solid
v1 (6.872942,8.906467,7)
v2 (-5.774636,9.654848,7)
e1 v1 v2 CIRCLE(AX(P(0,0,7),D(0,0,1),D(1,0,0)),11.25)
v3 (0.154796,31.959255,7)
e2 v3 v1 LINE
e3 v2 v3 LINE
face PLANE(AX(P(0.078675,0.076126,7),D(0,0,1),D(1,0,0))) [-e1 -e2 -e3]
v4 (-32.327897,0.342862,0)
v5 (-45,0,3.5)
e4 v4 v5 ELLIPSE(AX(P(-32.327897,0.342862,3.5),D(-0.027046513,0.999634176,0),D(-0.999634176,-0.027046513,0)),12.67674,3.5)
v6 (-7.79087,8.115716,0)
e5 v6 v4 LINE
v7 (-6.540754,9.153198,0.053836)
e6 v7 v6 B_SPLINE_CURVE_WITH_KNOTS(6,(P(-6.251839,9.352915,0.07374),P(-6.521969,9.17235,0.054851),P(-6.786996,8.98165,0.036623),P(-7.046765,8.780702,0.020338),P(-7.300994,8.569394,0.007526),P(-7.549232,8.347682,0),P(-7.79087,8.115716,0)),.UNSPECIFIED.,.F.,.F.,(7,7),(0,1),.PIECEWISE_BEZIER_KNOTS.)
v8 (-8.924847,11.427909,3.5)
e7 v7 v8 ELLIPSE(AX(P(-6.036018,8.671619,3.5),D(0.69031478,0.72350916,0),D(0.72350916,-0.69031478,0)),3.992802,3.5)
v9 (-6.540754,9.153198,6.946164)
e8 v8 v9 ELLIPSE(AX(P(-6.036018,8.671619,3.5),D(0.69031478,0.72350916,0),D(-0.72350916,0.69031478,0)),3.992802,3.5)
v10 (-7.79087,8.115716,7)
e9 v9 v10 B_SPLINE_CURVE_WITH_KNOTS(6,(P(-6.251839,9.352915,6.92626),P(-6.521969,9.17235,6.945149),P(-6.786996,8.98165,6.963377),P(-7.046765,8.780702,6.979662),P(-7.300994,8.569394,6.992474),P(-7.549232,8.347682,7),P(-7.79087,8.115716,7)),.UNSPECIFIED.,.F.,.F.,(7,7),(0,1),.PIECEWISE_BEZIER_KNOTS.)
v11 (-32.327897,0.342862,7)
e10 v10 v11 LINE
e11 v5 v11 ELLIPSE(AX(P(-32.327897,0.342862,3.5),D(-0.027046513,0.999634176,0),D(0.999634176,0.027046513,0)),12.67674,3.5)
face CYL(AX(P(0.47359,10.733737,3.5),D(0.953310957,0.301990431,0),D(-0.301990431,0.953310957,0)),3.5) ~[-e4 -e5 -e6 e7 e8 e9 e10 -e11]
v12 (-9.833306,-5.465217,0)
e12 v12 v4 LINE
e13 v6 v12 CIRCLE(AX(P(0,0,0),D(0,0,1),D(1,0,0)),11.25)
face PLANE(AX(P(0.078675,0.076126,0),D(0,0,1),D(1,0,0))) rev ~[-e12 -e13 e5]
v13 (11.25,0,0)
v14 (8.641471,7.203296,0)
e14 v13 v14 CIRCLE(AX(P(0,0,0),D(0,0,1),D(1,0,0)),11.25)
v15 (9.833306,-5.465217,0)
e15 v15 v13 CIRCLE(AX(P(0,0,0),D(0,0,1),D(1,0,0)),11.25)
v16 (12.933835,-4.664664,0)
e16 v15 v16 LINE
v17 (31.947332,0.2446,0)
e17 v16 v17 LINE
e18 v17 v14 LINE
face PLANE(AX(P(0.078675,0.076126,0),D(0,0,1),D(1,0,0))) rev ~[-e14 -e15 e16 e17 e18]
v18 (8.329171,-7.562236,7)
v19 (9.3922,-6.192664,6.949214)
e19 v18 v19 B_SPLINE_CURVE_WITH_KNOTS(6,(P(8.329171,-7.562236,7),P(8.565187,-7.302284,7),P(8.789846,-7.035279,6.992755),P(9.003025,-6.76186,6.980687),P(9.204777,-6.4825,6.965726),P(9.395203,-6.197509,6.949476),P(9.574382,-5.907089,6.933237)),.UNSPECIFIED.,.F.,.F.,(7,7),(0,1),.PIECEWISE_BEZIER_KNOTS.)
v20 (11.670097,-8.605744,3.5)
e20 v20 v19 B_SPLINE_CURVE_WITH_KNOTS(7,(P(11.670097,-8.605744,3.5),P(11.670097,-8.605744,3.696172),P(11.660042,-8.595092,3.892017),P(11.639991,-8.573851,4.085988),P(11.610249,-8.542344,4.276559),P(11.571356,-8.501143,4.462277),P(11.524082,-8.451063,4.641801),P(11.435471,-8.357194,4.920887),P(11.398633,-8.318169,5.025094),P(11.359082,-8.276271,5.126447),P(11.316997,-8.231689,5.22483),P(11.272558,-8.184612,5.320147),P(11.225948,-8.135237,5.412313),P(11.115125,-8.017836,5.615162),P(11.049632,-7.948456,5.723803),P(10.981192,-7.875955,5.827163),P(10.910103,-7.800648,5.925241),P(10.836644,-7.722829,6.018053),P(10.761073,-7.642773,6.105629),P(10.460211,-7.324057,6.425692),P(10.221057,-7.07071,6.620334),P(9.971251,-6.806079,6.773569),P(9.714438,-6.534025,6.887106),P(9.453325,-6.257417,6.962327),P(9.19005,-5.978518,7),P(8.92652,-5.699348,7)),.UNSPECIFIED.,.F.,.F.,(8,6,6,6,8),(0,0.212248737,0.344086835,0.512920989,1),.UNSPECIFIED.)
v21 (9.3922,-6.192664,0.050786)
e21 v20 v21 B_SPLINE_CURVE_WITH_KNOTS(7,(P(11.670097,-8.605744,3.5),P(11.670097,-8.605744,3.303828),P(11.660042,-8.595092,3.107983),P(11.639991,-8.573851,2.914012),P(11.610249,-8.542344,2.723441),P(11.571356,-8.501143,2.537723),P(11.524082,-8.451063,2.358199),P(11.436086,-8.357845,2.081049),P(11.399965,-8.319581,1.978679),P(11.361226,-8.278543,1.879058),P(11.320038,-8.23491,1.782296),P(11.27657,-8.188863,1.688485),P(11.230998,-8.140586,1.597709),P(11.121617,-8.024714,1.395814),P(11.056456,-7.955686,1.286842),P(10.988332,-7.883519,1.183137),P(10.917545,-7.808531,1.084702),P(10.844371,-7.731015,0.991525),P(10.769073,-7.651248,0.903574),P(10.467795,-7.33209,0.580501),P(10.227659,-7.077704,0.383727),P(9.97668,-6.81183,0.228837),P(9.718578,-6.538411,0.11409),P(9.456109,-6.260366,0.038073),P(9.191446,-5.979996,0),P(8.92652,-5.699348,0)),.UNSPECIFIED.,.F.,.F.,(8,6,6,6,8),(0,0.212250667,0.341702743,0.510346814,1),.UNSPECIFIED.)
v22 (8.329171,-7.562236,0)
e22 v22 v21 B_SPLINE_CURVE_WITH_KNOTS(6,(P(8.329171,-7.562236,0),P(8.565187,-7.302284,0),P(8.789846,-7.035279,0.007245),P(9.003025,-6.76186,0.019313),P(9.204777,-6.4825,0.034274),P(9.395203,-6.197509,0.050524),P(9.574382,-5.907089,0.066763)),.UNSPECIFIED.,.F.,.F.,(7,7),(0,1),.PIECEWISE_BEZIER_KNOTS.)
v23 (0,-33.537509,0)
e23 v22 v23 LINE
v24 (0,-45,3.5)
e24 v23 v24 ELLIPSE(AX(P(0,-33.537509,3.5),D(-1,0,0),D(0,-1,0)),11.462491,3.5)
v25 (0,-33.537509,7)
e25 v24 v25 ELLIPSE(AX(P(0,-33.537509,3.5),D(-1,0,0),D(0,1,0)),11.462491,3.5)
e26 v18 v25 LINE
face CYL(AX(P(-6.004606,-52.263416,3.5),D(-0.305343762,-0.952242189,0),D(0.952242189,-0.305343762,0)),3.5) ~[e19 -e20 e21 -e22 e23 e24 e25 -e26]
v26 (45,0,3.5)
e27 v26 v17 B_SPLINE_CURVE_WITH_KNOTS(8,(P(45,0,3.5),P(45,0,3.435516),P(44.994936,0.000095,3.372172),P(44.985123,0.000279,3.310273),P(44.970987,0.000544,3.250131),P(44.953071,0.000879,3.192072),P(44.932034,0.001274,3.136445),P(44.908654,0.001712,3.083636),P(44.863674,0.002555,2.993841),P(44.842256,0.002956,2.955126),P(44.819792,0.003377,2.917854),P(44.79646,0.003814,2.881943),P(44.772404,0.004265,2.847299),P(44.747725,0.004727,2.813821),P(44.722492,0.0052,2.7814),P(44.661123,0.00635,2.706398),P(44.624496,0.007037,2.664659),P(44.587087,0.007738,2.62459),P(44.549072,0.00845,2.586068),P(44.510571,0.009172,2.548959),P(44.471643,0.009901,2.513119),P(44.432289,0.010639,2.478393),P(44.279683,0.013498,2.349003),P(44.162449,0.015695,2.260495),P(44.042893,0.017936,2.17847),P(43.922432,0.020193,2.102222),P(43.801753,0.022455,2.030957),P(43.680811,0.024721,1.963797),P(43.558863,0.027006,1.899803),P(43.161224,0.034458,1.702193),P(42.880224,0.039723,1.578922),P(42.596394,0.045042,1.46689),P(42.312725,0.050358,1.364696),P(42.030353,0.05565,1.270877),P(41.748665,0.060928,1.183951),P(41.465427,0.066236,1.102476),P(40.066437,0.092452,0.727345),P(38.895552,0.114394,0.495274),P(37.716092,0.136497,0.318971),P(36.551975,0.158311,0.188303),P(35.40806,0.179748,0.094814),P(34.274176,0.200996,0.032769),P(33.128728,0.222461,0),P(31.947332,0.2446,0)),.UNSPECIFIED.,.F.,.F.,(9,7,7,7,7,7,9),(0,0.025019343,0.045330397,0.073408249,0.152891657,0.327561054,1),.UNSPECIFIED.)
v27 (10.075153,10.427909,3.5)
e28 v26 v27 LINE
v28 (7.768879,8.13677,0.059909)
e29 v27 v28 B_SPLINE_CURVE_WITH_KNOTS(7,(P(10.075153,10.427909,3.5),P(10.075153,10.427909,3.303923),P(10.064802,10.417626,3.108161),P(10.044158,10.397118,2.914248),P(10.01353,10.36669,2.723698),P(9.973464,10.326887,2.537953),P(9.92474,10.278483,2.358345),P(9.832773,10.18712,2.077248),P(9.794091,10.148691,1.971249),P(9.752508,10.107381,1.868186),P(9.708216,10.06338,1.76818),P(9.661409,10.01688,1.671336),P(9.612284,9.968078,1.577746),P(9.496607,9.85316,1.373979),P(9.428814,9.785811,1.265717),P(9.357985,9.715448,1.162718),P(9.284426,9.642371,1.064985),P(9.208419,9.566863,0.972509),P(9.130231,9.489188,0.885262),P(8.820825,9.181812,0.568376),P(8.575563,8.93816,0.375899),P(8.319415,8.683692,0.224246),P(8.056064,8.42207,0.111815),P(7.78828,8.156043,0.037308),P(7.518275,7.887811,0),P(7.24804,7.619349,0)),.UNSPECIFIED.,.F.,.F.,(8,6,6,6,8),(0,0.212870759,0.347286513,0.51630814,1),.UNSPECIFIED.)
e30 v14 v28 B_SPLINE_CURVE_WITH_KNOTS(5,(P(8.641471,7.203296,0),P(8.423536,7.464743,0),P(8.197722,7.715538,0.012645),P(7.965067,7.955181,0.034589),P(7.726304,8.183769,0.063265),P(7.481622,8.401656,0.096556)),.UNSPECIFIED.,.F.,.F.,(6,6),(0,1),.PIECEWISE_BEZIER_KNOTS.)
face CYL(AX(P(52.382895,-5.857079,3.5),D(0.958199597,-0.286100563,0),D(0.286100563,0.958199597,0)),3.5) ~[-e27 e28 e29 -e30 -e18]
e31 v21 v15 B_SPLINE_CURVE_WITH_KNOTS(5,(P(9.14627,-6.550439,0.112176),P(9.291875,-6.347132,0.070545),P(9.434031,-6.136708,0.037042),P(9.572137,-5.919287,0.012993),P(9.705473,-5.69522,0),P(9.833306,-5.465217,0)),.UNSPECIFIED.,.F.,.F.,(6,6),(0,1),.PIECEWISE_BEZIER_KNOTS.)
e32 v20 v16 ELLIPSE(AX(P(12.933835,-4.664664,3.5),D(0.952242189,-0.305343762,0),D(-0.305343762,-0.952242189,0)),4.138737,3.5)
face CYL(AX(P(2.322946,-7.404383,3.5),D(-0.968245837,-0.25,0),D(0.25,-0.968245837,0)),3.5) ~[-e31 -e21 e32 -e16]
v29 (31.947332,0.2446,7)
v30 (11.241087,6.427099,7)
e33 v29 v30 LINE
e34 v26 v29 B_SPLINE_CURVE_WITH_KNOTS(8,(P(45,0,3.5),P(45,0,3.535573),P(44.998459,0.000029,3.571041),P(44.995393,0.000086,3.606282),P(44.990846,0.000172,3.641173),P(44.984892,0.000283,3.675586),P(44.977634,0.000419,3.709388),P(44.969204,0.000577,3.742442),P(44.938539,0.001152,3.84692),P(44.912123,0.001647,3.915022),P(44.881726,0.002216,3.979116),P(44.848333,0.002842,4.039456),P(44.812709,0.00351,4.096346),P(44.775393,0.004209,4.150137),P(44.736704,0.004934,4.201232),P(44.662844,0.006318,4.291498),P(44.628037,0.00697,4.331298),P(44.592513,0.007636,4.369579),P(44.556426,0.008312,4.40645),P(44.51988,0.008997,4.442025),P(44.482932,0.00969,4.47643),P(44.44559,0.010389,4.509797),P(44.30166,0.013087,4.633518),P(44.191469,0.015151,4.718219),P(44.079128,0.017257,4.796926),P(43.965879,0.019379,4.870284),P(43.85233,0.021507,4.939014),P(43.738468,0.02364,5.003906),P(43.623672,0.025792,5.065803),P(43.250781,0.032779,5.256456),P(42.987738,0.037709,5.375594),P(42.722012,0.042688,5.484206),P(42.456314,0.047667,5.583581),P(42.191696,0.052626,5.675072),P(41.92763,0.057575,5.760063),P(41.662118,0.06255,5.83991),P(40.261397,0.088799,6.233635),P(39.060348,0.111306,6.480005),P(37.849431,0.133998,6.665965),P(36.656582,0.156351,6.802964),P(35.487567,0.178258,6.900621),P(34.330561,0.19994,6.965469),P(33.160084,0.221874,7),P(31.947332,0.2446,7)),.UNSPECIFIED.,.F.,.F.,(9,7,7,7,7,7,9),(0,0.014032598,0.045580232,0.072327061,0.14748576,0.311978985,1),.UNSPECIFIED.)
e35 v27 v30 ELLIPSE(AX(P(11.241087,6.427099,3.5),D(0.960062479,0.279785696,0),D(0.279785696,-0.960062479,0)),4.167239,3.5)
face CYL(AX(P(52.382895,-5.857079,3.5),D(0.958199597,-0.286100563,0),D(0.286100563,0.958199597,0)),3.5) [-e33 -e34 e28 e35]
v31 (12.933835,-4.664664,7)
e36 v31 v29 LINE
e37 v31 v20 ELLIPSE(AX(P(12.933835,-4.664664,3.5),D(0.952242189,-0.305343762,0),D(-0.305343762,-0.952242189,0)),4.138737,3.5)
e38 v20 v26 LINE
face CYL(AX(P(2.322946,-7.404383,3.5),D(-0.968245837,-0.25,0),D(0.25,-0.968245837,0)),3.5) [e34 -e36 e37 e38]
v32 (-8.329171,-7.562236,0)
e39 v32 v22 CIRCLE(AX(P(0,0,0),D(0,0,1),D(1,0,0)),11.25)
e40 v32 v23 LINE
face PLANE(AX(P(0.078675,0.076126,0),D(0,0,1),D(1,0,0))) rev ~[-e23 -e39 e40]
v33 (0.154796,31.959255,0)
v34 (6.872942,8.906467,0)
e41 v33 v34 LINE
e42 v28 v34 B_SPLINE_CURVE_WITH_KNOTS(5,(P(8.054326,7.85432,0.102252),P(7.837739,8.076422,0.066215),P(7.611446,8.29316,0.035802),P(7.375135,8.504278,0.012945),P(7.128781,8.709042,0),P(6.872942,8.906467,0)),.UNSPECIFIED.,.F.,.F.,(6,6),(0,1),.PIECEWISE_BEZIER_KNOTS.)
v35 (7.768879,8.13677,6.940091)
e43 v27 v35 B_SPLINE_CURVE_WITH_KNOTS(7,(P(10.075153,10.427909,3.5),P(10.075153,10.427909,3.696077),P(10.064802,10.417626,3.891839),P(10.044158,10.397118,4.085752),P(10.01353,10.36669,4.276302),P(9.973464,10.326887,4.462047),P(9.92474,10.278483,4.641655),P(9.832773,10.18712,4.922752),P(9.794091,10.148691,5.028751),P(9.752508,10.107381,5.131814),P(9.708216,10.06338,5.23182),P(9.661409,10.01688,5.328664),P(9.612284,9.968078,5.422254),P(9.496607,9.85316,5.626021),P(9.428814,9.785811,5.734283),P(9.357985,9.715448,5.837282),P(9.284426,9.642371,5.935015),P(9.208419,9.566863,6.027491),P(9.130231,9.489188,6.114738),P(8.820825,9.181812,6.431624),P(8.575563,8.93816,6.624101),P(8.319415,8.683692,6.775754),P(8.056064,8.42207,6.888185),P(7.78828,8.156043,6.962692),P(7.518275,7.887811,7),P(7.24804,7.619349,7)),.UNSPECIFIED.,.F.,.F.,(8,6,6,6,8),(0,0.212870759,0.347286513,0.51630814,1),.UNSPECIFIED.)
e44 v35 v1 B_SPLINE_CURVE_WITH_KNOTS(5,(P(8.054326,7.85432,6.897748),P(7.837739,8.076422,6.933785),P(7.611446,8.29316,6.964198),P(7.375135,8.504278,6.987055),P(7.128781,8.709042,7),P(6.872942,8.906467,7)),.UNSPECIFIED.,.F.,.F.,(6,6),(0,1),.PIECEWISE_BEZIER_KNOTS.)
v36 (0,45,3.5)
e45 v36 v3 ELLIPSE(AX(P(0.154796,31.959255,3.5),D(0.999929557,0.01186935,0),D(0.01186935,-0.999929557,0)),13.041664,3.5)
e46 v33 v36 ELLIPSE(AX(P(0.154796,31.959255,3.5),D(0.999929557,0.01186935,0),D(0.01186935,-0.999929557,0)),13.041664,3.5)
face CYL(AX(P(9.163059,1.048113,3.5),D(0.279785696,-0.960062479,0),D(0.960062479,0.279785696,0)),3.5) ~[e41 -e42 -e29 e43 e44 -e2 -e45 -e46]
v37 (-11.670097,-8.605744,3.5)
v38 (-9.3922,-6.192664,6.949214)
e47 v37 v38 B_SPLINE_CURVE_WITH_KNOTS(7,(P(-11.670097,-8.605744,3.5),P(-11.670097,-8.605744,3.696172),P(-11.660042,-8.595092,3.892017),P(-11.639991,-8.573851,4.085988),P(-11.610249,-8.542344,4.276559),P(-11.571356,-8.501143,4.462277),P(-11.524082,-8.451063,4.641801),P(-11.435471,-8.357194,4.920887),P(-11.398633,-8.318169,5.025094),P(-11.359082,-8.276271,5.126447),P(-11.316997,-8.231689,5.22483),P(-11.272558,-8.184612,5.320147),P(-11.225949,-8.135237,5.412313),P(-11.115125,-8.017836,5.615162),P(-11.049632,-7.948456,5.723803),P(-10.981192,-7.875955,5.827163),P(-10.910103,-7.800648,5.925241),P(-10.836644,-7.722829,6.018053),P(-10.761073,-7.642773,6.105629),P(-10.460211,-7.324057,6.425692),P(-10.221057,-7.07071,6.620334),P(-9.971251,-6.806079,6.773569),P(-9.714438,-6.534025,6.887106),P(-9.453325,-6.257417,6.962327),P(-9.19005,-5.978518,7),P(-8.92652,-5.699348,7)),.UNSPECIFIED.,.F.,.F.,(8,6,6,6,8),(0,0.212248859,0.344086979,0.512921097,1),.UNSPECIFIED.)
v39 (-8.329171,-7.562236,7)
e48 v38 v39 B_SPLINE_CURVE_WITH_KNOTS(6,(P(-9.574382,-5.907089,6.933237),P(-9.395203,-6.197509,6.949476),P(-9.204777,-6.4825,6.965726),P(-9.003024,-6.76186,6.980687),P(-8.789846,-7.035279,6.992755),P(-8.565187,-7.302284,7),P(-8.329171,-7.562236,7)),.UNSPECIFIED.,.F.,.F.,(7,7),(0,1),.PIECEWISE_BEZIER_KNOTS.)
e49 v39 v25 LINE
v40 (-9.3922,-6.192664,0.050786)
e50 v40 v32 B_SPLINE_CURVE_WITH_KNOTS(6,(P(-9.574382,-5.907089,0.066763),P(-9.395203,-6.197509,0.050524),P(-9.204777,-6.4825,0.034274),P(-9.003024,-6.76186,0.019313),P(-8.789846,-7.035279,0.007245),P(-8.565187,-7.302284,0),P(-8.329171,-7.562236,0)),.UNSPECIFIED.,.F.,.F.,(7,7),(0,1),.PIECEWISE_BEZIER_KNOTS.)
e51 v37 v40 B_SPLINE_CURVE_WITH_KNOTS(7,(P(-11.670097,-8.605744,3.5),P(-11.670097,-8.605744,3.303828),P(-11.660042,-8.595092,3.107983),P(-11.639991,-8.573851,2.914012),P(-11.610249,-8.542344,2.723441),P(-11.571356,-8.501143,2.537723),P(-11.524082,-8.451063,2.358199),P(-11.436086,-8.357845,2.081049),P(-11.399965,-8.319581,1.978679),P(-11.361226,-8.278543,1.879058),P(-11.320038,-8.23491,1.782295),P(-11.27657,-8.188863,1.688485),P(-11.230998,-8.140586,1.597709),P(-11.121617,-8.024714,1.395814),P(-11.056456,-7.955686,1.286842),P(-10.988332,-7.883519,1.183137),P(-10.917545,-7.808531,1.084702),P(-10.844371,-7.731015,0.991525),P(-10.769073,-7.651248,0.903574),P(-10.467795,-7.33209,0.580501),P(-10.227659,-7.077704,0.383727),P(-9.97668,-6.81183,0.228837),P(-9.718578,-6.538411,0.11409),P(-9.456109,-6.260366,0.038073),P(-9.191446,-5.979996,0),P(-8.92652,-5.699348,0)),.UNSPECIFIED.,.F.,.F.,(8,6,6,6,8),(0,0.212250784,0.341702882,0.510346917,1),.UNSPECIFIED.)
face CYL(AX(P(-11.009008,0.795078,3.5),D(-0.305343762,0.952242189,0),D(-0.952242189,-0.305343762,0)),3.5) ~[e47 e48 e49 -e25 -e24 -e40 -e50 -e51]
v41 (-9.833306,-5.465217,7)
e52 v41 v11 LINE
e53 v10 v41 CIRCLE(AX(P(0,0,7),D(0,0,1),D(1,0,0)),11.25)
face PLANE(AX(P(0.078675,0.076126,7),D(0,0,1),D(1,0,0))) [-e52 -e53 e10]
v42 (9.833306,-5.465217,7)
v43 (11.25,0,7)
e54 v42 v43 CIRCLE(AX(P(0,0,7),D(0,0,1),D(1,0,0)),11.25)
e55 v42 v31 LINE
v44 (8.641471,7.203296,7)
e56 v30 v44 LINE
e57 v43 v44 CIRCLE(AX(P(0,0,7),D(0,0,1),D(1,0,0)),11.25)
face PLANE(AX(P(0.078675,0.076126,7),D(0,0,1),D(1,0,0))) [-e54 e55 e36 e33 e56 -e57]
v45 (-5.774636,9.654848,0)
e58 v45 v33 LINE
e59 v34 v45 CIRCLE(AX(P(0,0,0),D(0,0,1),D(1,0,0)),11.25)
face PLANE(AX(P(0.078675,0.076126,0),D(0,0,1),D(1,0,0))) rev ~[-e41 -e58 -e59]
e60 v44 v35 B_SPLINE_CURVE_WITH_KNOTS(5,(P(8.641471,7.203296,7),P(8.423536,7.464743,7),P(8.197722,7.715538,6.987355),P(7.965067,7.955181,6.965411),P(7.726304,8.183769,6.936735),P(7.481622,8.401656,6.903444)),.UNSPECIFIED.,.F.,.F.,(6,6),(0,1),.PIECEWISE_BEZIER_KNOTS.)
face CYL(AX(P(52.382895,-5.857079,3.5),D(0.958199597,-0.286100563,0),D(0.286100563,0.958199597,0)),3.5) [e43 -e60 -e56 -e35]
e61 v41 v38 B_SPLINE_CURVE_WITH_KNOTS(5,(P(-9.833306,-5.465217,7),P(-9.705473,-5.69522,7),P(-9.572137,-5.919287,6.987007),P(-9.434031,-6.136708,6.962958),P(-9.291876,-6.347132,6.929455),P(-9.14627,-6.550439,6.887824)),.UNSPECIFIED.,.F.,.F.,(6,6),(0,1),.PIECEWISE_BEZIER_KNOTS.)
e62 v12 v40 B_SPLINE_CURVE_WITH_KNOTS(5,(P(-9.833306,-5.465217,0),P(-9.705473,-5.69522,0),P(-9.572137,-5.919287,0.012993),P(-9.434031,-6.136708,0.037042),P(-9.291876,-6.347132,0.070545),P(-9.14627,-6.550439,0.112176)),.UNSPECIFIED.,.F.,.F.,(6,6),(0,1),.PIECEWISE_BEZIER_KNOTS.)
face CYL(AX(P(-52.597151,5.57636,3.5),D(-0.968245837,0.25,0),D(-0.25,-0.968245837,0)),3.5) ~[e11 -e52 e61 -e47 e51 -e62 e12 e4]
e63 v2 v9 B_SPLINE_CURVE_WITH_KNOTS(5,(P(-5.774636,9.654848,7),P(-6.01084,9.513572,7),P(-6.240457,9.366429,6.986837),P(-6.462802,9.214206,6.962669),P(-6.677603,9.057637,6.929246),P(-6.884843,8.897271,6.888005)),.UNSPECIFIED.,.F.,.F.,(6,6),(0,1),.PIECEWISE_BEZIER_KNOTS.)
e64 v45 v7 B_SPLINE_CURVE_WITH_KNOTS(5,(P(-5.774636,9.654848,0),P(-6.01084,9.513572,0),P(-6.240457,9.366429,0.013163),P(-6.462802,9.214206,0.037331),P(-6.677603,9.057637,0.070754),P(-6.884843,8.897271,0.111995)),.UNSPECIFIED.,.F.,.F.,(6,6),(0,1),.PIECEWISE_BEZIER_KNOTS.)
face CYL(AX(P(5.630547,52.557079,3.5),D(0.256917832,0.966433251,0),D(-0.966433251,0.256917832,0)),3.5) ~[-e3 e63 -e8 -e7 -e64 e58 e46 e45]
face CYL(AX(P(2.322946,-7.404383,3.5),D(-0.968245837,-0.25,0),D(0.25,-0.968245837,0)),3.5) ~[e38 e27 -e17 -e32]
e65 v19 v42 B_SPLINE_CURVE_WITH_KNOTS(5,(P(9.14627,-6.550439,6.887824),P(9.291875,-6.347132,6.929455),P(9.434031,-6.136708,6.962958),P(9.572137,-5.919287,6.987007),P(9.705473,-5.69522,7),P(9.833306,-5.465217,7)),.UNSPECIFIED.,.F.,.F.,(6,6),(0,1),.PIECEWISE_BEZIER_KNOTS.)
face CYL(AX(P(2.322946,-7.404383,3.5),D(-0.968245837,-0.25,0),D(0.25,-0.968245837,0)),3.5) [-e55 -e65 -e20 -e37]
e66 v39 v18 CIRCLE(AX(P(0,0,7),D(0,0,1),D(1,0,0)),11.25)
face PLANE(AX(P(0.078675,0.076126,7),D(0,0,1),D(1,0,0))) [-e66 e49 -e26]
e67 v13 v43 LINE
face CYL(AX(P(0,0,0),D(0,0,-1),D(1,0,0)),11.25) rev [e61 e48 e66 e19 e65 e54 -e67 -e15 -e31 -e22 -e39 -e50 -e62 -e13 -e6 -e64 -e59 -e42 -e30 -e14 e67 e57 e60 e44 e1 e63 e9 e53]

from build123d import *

# Parameters (mm, degrees)
F0_R         = 11.25
F1_DEPTH     = 7
F2_T4_DEPTH  = 53.5102509631
F2_T9_DEPTH  = 52.2381371755
F2_T14_DEPTH = 55.3419579342
F2_T19_DEPTH = 51.9229754131
F2_T24_DEPTH = 55.7195375849
F2_T29_DEPTH = 55.7195375849
F2_T34_DEPTH = 51.9229754131
F2_T39_DEPTH = 53.9484048993
F2_T45_DEPTH = 53.9484048993
F2_T49_DEPTH = 53.5102509631
F2_T56_DEPTH = 52.2381371755
F2_T60_DEPTH = 55.3419579342
F2_T67_DEPTH = 55.7195375849
F2_T71_DEPTH = 51.9229754131
F2_T78_DEPTH = 55.7195375849
F2_T82_DEPTH = 51.9229754131
F3_T4_DEPTH  = 53.5102509631
F3_T9_DEPTH  = 53.9484048993
F3_T14_DEPTH = 51.9229754131
F3_T19_DEPTH = 55.7195375849
F3_T24_DEPTH = 55.7195375849
F3_T29_DEPTH = 51.9229754131
F3_T34_DEPTH = 55.3419579342
F3_T39_DEPTH = 52.2381371755
F3_T45_DEPTH = 53.5102509631
F3_T49_DEPTH = 53.9484048993
F3_T56_DEPTH = 51.9229754131
F3_T60_DEPTH = 55.7195375849
F3_T67_DEPTH = 55.7195375849
F3_T71_DEPTH = 51.9229754131
F3_T78_DEPTH = 55.3419579342
F3_T82_DEPTH = 52.2381371755


# Not quite as in the source:
# - a fillet or chamfer that OpenCascade refuses, or shapes differently, is made with other operations: its cross-section is extruded or revolved along the edge and cut away or added


with BuildPart() as f1:
    # F0 (on Top) → F1 (new body)
    with BuildSketch(Plane.XY):
        with BuildLine():
            ThreePointArc((11.6700973746, -8.6057438533), (13.7743677156, -4.5295467802), (14.5, 0))
            ThreePointArc((14.5, 0), (13.3480283218, 5.6639332553), (10.0751531144, 10.4279091731))
            ThreePointArc((10.0751531144, 10.4279091731), (0.7621030803, 14.4799585253), (-8.9248468856, 11.4279091731))
            ThreePointArc((-8.9248468856, 11.4279091731), (-14.3657490464, 1.9685665686), (-11.6700973746, -8.6057438533))
            ThreePointArc((-11.6700973746, -8.6057438533), (0, -14.5), (11.6700973746, -8.6057438533))
        make_face()
        Circle(F0_R, mode=Mode.SUBTRACT)
        with BuildLine():
            ThreePointArc((10.0751531144, 10.4279091731), (13.3480283218, 5.6639332553), (14.5, 0))
            ThreePointArc((14.5, 0), (13.7743677156, -4.5295467802), (11.6700973746, -8.6057438533))
            Line((11.6700973746, -8.6057438533), (45, 0))
            Line((45, 0), (10.0751531144, 10.4279091731))
        make_face()
        with BuildLine():
            ThreePointArc((-8.9248468856, 11.4279091731), (0.7621030803, 14.4799585253), (10.0751531144, 10.4279091731))
            Line((10.0751531144, 10.4279091731), (0, 45))
            Line((0, 45), (-8.9248468856, 11.4279091731))
        make_face()
        with BuildLine():
            Line((0, -45), (11.6700973746, -8.6057438533))
            ThreePointArc((11.6700973746, -8.6057438533), (0, -14.5), (-11.6700973746, -8.6057438533))
            Line((-11.6700973746, -8.6057438533), (0, -45))
        make_face()
        with BuildLine():
            ThreePointArc((-11.6700973746, -8.6057438533), (-14.3657490464, 1.9685665686), (-8.9248468856, 11.4279091731))
            Line((-8.9248468856, 11.4279091731), (-45, 0))
            Line((-45, 0), (-11.6700973746, -8.6057438533))
        make_face()
    extrude(amount=F1_DEPTH)

    # F2: fillet of radius 3.5 on 8 edges, made by hand


with BuildPart() as f2_tool2:
    # F2_s3 → F2_t4 (new body)
    with BuildSketch(Plane(origin=(0.4357492619, -1.4952391183, 0), x_dir=(0, 0, 1), z_dir=(-0.2797856956, 0.9600624795, 0))):
        with BuildLine():
            ThreePointArc((3.5, 12.5903563019), (5.9748737342, 11.5652300361), (7, 9.0903563019))
            Line((7, 9.0903563019), (7, 12.5903563019))
            Line((7, 12.5903563019), (3.5, 12.5903563019))
        make_face()
    extrude(amount=F2_T4_DEPTH)

    split(bisect_by=Plane(origin=(3.6834089544, 12.3363650004, 0), x_dir=(0, 0, 1), z_dir=(0.2861005633, 0.958199597, 0)), keep=Keep.TOP)


with BuildPart() as f1_1:
    add(f1.part)

    # F2_t1: cut F2_tool2
    add(f2_tool2.part, mode=Mode.SUBTRACT)


with BuildPart() as f2_tool7:
    # F2_s8 → F2_t9 (new body)
    with BuildSketch(Plane(origin=(13.4212581193, 50.4859861874, 0), x_dir=(0, 0, 1), z_dir=(-0.2569178318, -0.9664332505, 0))):
        with BuildLine():
            ThreePointArc((3.5, 11.5613024332), (5.9748737342, 10.5361761674), (7, 8.0613024332))
            Line((7, 8.0613024332), (7, 11.5613024332))
            Line((7, 11.5613024332), (3.5, 11.5613024332))
        make_face()
    extrude(amount=F2_T9_DEPTH)

    split(bisect_by=Plane(origin=(-4.1039199091, 12.9550853833, 0), x_dir=(0, 0, 1), z_dir=(-0.3019904306, 0.9533109565, 0)), keep=Keep.TOP)


with BuildPart() as f1_2:
    add(f1_1.part)

    # F2_t6: cut F2_tool7
    add(f2_tool7.part, mode=Mode.SUBTRACT)


with BuildPart() as f2_tool12:
    # F2_s13 → F2_t14 (new body)
    with BuildSketch(Plane(origin=(3.5205438929, 1.1152400579, 0), x_dir=(0, 0, 1), z_dir=(-0.9533109565, -0.3019904306, 0))):
        with BuildLine():
            ThreePointArc((3.5, 13.5895693791), (5.9748737342, 12.5644431133), (7, 10.0895693791))
            Line((7, 10.0895693791), (7, 13.5895693791))
            Line((7, 13.5895693791), (3.5, 13.5895693791))
        make_face()
    extrude(amount=F2_T14_DEPTH)

    split(bisect_by=Plane(origin=(-11.1732270906, 2.9703047545, 0), x_dir=(0, 0, 1), z_dir=(-0.9664332505, 0.2569178318, 0)), keep=Keep.TOP)


with BuildPart() as f1_3:
    add(f1_2.part)

    # F2_t11: cut F2_tool12
    add(f2_tool12.part, mode=Mode.SUBTRACT)


with BuildPart() as f2_tool17:
    # F2_s18 → F2_t19 (new body)
    with BuildSketch(Plane(origin=(-50.6596510698, 13.0802656612, 0), x_dir=(0, 0, 1), z_dir=(0.9682458366, -0.25, 0))):
        with BuildLine():
            ThreePointArc((3.5, 11.25), (5.9748737342, 10.2248737342), (7, 7.75))
            Line((7, 7.75), (7, 11.25))
            Line((7, 11.25), (3.5, 11.25))
        make_face()
    extrude(amount=F2_T19_DEPTH)

    split(bisect_by=Plane(origin=(-13.0842545446, -4.1955665749, 0), x_dir=(0, 0, 1), z_dir=(-0.9522421894, -0.3053437616, 0)), keep=Keep.TOP)


with BuildPart() as f1_4:
    add(f1_3.part)

    # F2_t16: cut F2_tool17
    add(f2_tool17.part, mode=Mode.SUBTRACT)


with BuildPart() as f2_tool22:
    # F2_s23 → F2_t24 (new body)
    with BuildSketch(Plane(origin=(-1.2576007444, 3.9219418787, 0), x_dir=(0, 0, 1), z_dir=(0.3053437616, -0.9522421894, 0))):
        with BuildLine():
            ThreePointArc((3.5, 13.7404692741), (5.9748737342, 12.7153430082), (7, 10.2404692741))
            Line((7, 10.2404692741), (7, 13.7404692741))
            Line((7, 13.7404692741), (3.5, 13.7404692741))
        make_face()
    extrude(amount=F2_T24_DEPTH)

    split(bisect_by=Plane(origin=(-2.8125, -10.8927656612, 0), x_dir=(0, 0, 1), z_dir=(-0.25, -0.9682458366, 0)), keep=Keep.TOP)


with BuildPart() as f1_5:
    add(f1_4.part)

    # F2_t21: cut F2_tool22
    add(f2_tool22.part, mode=Mode.SUBTRACT)


with BuildPart() as f2_tool27:
    # F2_s28 → F2_t29 (new body)
    with BuildSketch(Plane(origin=(-15.756012459, -49.1365525821, 0), x_dir=(0, 0, 1), z_dir=(0.3053437616, 0.9522421894, 0))):
        with BuildLine():
            ThreePointArc((3.5, 13.7404692741), (5.9748737342, 12.7153430082), (7, 10.2404692741))
            Line((7, 10.2404692741), (7, 13.7404692741))
            Line((7, 13.7404692741), (3.5, 13.7404692741))
        make_face()
    extrude(amount=F2_T29_DEPTH)

    split(bisect_by=Plane(origin=(2.8125, -10.8927656612, 0), x_dir=(0, 0, 1), z_dir=(0.25, -0.9682458366, 0)), keep=Keep.TOP)


with BuildPart() as f1_6:
    add(f1_5.part)

    # F2_t26: cut F2_tool27
    add(f2_tool27.part, mode=Mode.SUBTRACT)


with BuildPart() as f2_tool32:
    # F2_s33 → F2_t34 (new body)
    with BuildSketch(Plane(origin=(0.3854463047, 0.0995218079, 0), x_dir=(0, 0, 1), z_dir=(0.9682458366, 0.25, 0))):
        with BuildLine():
            ThreePointArc((3.5, 11.25), (5.9748737342, 10.2248737342), (7, 7.75))
            Line((7, 7.75), (7, 11.25))
            Line((7, 11.25), (3.5, 11.25))
        make_face()
    extrude(amount=F2_T34_DEPTH)

    split(bisect_by=Plane(origin=(13.0842545446, -4.1955665749, 0), x_dir=(0, 0, 1), z_dir=(0.9522421894, -0.3053437616, 0)), keep=Keep.TOP)


with BuildPart() as f1_7:
    add(f1_6.part)

    # F2_t31: cut F2_tool32
    add(f2_tool32.part, mode=Mode.SUBTRACT)


with BuildPart() as f2_tool37:
    # F2_s38 → F2_t39 (new body)
    with BuildSketch(Plane(origin=(49.7008375193, -14.8397449293, 0), x_dir=(0, 0, 1), z_dir=(-0.958199597, 0.2861005633, 0))):
        with BuildLine():
            ThreePointArc((3.5, 12.8745253485), (5.9748737342, 11.8493990826), (7, 9.3745253485))
            Line((7, 9.3745253485), (7, 12.8745253485))
            Line((7, 12.8745253485), (3.5, 12.8745253485))
        make_face()
    extrude(amount=F2_T39_DEPTH)

    split(bisect_by=Plane(origin=(12.087528689, 3.5226015958, 0), x_dir=(0, 0, 1), z_dir=(0.9600624795, 0.2797856956, 0)), keep=Keep.TOP)


with BuildPart() as f1_8:
    add(f1_7.part)

    # F2_t36: cut F2_tool37
    add(f2_tool37.part, mode=Mode.SUBTRACT)


with BuildPart() as f2_tool43:
    # F2_s44 → F2_t45 (new body)
    with BuildSketch(Plane(origin=(49.7008375193, -14.8397449293, 0), x_dir=(0, 0, 1), z_dir=(-0.958199597, 0.2861005633, 0))):
        with BuildLine():
            ThreePointArc((3.5, 12.8745253485), (5.9748737342, 11.8493990826), (7, 9.3745253485))
            Line((7, 9.3745253485), (7, 12.8745253485))
            Line((7, 12.8745253485), (3.5, 12.8745253485))
        make_face()
    extrude(amount=F2_T45_DEPTH)

    split(bisect_by=Plane(origin=(12.087528689, 3.5226015958, 0), x_dir=(0, 0, 1), z_dir=(-0.9600624795, -0.2797856956, 0)), keep=Keep.TOP)


with BuildPart() as f2_tool47:
    # F2_s48 → F2_t49 (new body)
    with BuildSketch(Plane(origin=(0.4357492619, -1.4952391183, 0), x_dir=(0, 0, 1), z_dir=(-0.2797856956, 0.9600624795, 0))):
        with BuildLine():
            ThreePointArc((3.5, 12.5903563019), (5.9748737342, 11.5652300361), (7, 9.0903563019))
            Line((7, 9.0903563019), (7, 12.5903563019))
            Line((7, 12.5903563019), (3.5, 12.5903563019))
        make_face()
    extrude(amount=F2_T49_DEPTH)

    split(bisect_by=Plane(origin=(3.6834089544, 12.3363650004, 0), x_dir=(0, 0, 1), z_dir=(-0.2861005633, -0.958199597, 0)), keep=Keep.TOP)


with BuildPart() as f2_tool43_1:
    add(f2_tool43.part)

    # F2_t51: intersect F2_tool47
    add(f2_tool47.part, mode=Mode.INTERSECT)


with BuildPart() as f1_9:
    add(f1_8.part)

    # F2_t41: cut F2_tool43
    add(f2_tool43_1.part, mode=Mode.SUBTRACT)


with BuildPart() as f2_tool54:
    # F2_s55 → F2_t56 (new body)
    with BuildSketch(Plane(origin=(13.4212581193, 50.4859861874, 0), x_dir=(0, 0, 1), z_dir=(-0.2569178318, -0.9664332505, 0))):
        with BuildLine():
            ThreePointArc((3.5, 11.5613024332), (5.9748737342, 10.5361761674), (7, 8.0613024332))
            Line((7, 8.0613024332), (7, 11.5613024332))
            Line((7, 11.5613024332), (3.5, 11.5613024332))
        make_face()
    extrude(amount=F2_T56_DEPTH)

    split(bisect_by=Plane(origin=(-4.1039199091, 12.9550853833, 0), x_dir=(0, 0, 1), z_dir=(0.3019904306, -0.9533109565, 0)), keep=Keep.TOP)


with BuildPart() as f2_tool58:
    # F2_s59 → F2_t60 (new body)
    with BuildSketch(Plane(origin=(3.5205438929, 1.1152400579, 0), x_dir=(0, 0, 1), z_dir=(-0.9533109565, -0.3019904306, 0))):
        with BuildLine():
            ThreePointArc((3.5, 13.5895693791), (5.9748737342, 12.5644431133), (7, 10.0895693791))
            Line((7, 10.0895693791), (7, 13.5895693791))
            Line((7, 13.5895693791), (3.5, 13.5895693791))
        make_face()
    extrude(amount=F2_T60_DEPTH)

    split(bisect_by=Plane(origin=(-11.1732270906, 2.9703047545, 0), x_dir=(0, 0, 1), z_dir=(0.9664332505, -0.2569178318, 0)), keep=Keep.TOP)


with BuildPart() as f2_tool54_1:
    add(f2_tool54.part)

    # F2_t62: intersect F2_tool58
    add(f2_tool58.part, mode=Mode.INTERSECT)


with BuildPart() as f1_10:
    add(f1_9.part)

    # F2_t52: cut F2_tool54
    add(f2_tool54_1.part, mode=Mode.SUBTRACT)


with BuildPart() as f2_tool65:
    # F2_s66 → F2_t67 (new body)
    with BuildSketch(Plane(origin=(-1.2576007444, 3.9219418787, 0), x_dir=(0, 0, 1), z_dir=(0.3053437616, -0.9522421894, 0))):
        with BuildLine():
            ThreePointArc((3.5, 13.7404692741), (5.9748737342, 12.7153430082), (7, 10.2404692741))
            Line((7, 10.2404692741), (7, 13.7404692741))
            Line((7, 13.7404692741), (3.5, 13.7404692741))
        make_face()
    extrude(amount=F2_T67_DEPTH)

    split(bisect_by=Plane(origin=(-2.8125, -10.8927656612, 0), x_dir=(0, 0, 1), z_dir=(0.25, 0.9682458366, 0)), keep=Keep.TOP)


with BuildPart() as f2_tool69:
    # F2_s70 → F2_t71 (new body)
    with BuildSketch(Plane(origin=(-50.6596510698, 13.0802656612, 0), x_dir=(0, 0, 1), z_dir=(0.9682458366, -0.25, 0))):
        with BuildLine():
            ThreePointArc((3.5, 11.25), (5.9748737342, 10.2248737342), (7, 7.75))
            Line((7, 7.75), (7, 11.25))
            Line((7, 11.25), (3.5, 11.25))
        make_face()
    extrude(amount=F2_T71_DEPTH)

    split(bisect_by=Plane(origin=(-13.0842545446, -4.1955665749, 0), x_dir=(0, 0, 1), z_dir=(0.9522421894, 0.3053437616, 0)), keep=Keep.TOP)


with BuildPart() as f2_tool65_1:
    add(f2_tool65.part)

    # F2_t73: intersect F2_tool69
    add(f2_tool69.part, mode=Mode.INTERSECT)


with BuildPart() as f1_11:
    add(f1_10.part)

    # F2_t63: cut F2_tool65
    add(f2_tool65_1.part, mode=Mode.SUBTRACT)


with BuildPart() as f2_tool76:
    # F2_s77 → F2_t78 (new body)
    with BuildSketch(Plane(origin=(-15.756012459, -49.1365525821, 0), x_dir=(0, 0, 1), z_dir=(0.3053437616, 0.9522421894, 0))):
        with BuildLine():
            ThreePointArc((3.5, 13.7404692741), (5.9748737342, 12.7153430082), (7, 10.2404692741))
            Line((7, 10.2404692741), (7, 13.7404692741))
            Line((7, 13.7404692741), (3.5, 13.7404692741))
        make_face()
    extrude(amount=F2_T78_DEPTH)

    split(bisect_by=Plane(origin=(2.8125, -10.8927656612, 0), x_dir=(0, 0, 1), z_dir=(-0.25, 0.9682458366, 0)), keep=Keep.TOP)


with BuildPart() as f2_tool80:
    # F2_s81 → F2_t82 (new body)
    with BuildSketch(Plane(origin=(0.3854463047, 0.0995218079, 0), x_dir=(0, 0, 1), z_dir=(0.9682458366, 0.25, 0))):
        with BuildLine():
            ThreePointArc((3.5, 11.25), (5.9748737342, 10.2248737342), (7, 7.75))
            Line((7, 7.75), (7, 11.25))
            Line((7, 11.25), (3.5, 11.25))
        make_face()
    extrude(amount=F2_T82_DEPTH)

    split(bisect_by=Plane(origin=(13.0842545446, -4.1955665749, 0), x_dir=(0, 0, 1), z_dir=(-0.9522421894, 0.3053437616, 0)), keep=Keep.TOP)


with BuildPart() as f2_tool76_1:
    add(f2_tool76.part)

    # F2_t84: intersect F2_tool80
    add(f2_tool80.part, mode=Mode.INTERSECT)


with BuildPart() as f1_12:
    add(f1_11.part)

    # F2_t74: cut F2_tool76
    add(f2_tool76_1.part, mode=Mode.SUBTRACT)

    # F3: fillet of radius 3.5 on 8 edges, made by hand


with BuildPart() as f3_tool2:
    # F3_s3 → F3_t4 (new body)
    with BuildSketch(Plane(origin=(0.4357492619, -1.4952391183, 0), x_dir=(0, 0, 1), z_dir=(-0.2797856956, 0.9600624795, 0))):
        with BuildLine():
            ThreePointArc((3.5, 12.5903563019), (1.0251262658, 11.5652300361), (0, 9.0903563019))
            Line((0, 9.0903563019), (0, 12.5903563019))
            Line((0, 12.5903563019), (3.5, 12.5903563019))
        make_face()
    extrude(amount=F3_T4_DEPTH)

    split(bisect_by=Plane(origin=(3.6834089544, 12.3363650004, 0), x_dir=(0, 0, 1), z_dir=(0.2861005633, 0.958199597, 0)), keep=Keep.TOP)


with BuildPart() as f1_13:
    add(f1_12.part)

    # F3_t1: cut F3_tool2
    add(f3_tool2.part, mode=Mode.SUBTRACT)


with BuildPart() as f3_tool7:
    # F3_s8 → F3_t9 (new body)
    with BuildSketch(Plane(origin=(49.7008375193, -14.8397449293, 0), x_dir=(0, 0, 1), z_dir=(-0.958199597, 0.2861005633, 0))):
        with BuildLine():
            ThreePointArc((3.5, 12.8745253485), (1.0251262658, 11.8493990826), (0, 9.3745253485))
            Line((0, 9.3745253485), (0, 12.8745253485))
            Line((0, 12.8745253485), (3.5, 12.8745253485))
        make_face()
    extrude(amount=F3_T9_DEPTH)

    split(bisect_by=Plane(origin=(12.087528689, 3.5226015958, 0), x_dir=(0, 0, 1), z_dir=(0.9600624795, 0.2797856956, 0)), keep=Keep.TOP)


with BuildPart() as f1_14:
    add(f1_13.part)

    # F3_t6: cut F3_tool7
    add(f3_tool7.part, mode=Mode.SUBTRACT)


with BuildPart() as f3_tool12:
    # F3_s13 → F3_t14 (new body)
    with BuildSketch(Plane(origin=(0.3854463047, 0.0995218079, 0), x_dir=(0, 0, 1), z_dir=(0.9682458366, 0.25, 0))):
        with BuildLine():
            ThreePointArc((3.5, 11.25), (1.0251262658, 10.2248737342), (0, 7.75))
            Line((0, 7.75), (0, 11.25))
            Line((0, 11.25), (3.5, 11.25))
        make_face()
    extrude(amount=F3_T14_DEPTH)

    split(bisect_by=Plane(origin=(13.0842545446, -4.1955665749, 0), x_dir=(0, 0, 1), z_dir=(0.9522421894, -0.3053437616, 0)), keep=Keep.TOP)


with BuildPart() as f1_15:
    add(f1_14.part)

    # F3_t11: cut F3_tool12
    add(f3_tool12.part, mode=Mode.SUBTRACT)


with BuildPart() as f3_tool17:
    # F3_s18 → F3_t19 (new body)
    with BuildSketch(Plane(origin=(-15.756012459, -49.1365525821, 0), x_dir=(0, 0, 1), z_dir=(0.3053437616, 0.9522421894, 0))):
        with BuildLine():
            ThreePointArc((3.5, 13.7404692741), (1.0251262658, 12.7153430082), (0, 10.2404692741))
            Line((0, 10.2404692741), (0, 13.7404692741))
            Line((0, 13.7404692741), (3.5, 13.7404692741))
        make_face()
    extrude(amount=F3_T19_DEPTH)

    split(bisect_by=Plane(origin=(2.8125, -10.8927656612, 0), x_dir=(0, 0, 1), z_dir=(0.25, -0.9682458366, 0)), keep=Keep.TOP)


with BuildPart() as f1_16:
    add(f1_15.part)

    # F3_t16: cut F3_tool17
    add(f3_tool17.part, mode=Mode.SUBTRACT)


with BuildPart() as f3_tool22:
    # F3_s23 → F3_t24 (new body)
    with BuildSketch(Plane(origin=(-1.2576007444, 3.9219418787, 0), x_dir=(0, 0, 1), z_dir=(0.3053437616, -0.9522421894, 0))):
        with BuildLine():
            ThreePointArc((3.5, 13.7404692741), (1.0251262658, 12.7153430082), (0, 10.2404692741))
            Line((0, 10.2404692741), (0, 13.7404692741))
            Line((0, 13.7404692741), (3.5, 13.7404692741))
        make_face()
    extrude(amount=F3_T24_DEPTH)

    split(bisect_by=Plane(origin=(-2.8125, -10.8927656612, 0), x_dir=(0, 0, 1), z_dir=(-0.25, -0.9682458366, 0)), keep=Keep.TOP)


with BuildPart() as f1_17:
    add(f1_16.part)

    # F3_t21: cut F3_tool22
    add(f3_tool22.part, mode=Mode.SUBTRACT)


with BuildPart() as f3_tool27:
    # F3_s28 → F3_t29 (new body)
    with BuildSketch(Plane(origin=(-50.6596510698, 13.0802656612, 0), x_dir=(0, 0, 1), z_dir=(0.9682458366, -0.25, 0))):
        with BuildLine():
            ThreePointArc((3.5, 11.25), (1.0251262658, 10.2248737342), (0, 7.75))
            Line((0, 7.75), (0, 11.25))
            Line((0, 11.25), (3.5, 11.25))
        make_face()
    extrude(amount=F3_T29_DEPTH)

    split(bisect_by=Plane(origin=(-13.0842545446, -4.1955665749, 0), x_dir=(0, 0, 1), z_dir=(-0.9522421894, -0.3053437616, 0)), keep=Keep.TOP)


with BuildPart() as f1_18:
    add(f1_17.part)

    # F3_t26: cut F3_tool27
    add(f3_tool27.part, mode=Mode.SUBTRACT)


with BuildPart() as f3_tool32:
    # F3_s33 → F3_t34 (new body)
    with BuildSketch(Plane(origin=(3.5205438929, 1.1152400579, 0), x_dir=(0, 0, 1), z_dir=(-0.9533109565, -0.3019904306, 0))):
        with BuildLine():
            ThreePointArc((3.5, 13.5895693791), (1.0251262658, 12.5644431133), (0, 10.0895693791))
            Line((0, 10.0895693791), (0, 13.5895693791))
            Line((0, 13.5895693791), (3.5, 13.5895693791))
        make_face()
    extrude(amount=F3_T34_DEPTH)

    split(bisect_by=Plane(origin=(-11.1732270906, 2.9703047545, 0), x_dir=(0, 0, 1), z_dir=(-0.9664332505, 0.2569178318, 0)), keep=Keep.TOP)


with BuildPart() as f1_19:
    add(f1_18.part)

    # F3_t31: cut F3_tool32
    add(f3_tool32.part, mode=Mode.SUBTRACT)


with BuildPart() as f3_tool37:
    # F3_s38 → F3_t39 (new body)
    with BuildSketch(Plane(origin=(13.4212581193, 50.4859861874, 0), x_dir=(0, 0, 1), z_dir=(-0.2569178318, -0.9664332505, 0))):
        with BuildLine():
            ThreePointArc((3.5, 11.5613024332), (1.0251262658, 10.5361761674), (0, 8.0613024332))
            Line((0, 8.0613024332), (0, 11.5613024332))
            Line((0, 11.5613024332), (3.5, 11.5613024332))
        make_face()
    extrude(amount=F3_T39_DEPTH)

    split(bisect_by=Plane(origin=(-4.1039199091, 12.9550853833, 0), x_dir=(0, 0, 1), z_dir=(-0.3019904306, 0.9533109565, 0)), keep=Keep.TOP)


with BuildPart() as f1_20:
    add(f1_19.part)

    # F3_t36: cut F3_tool37
    add(f3_tool37.part, mode=Mode.SUBTRACT)


with BuildPart() as f3_tool43:
    # F3_s44 → F3_t45 (new body)
    with BuildSketch(Plane(origin=(0.4357492619, -1.4952391183, 0), x_dir=(0, 0, 1), z_dir=(-0.2797856956, 0.9600624795, 0))):
        with BuildLine():
            ThreePointArc((3.5, 12.5903563019), (1.0251262658, 11.5652300361), (0, 9.0903563019))
            Line((0, 9.0903563019), (0, 12.5903563019))
            Line((0, 12.5903563019), (3.5, 12.5903563019))
        make_face()
    extrude(amount=F3_T45_DEPTH)

    split(bisect_by=Plane(origin=(3.6834089544, 12.3363650004, 0), x_dir=(0, 0, 1), z_dir=(-0.2861005633, -0.958199597, 0)), keep=Keep.TOP)


with BuildPart() as f3_tool47:
    # F3_s48 → F3_t49 (new body)
    with BuildSketch(Plane(origin=(49.7008375193, -14.8397449293, 0), x_dir=(0, 0, 1), z_dir=(-0.958199597, 0.2861005633, 0))):
        with BuildLine():
            ThreePointArc((3.5, 12.8745253485), (1.0251262658, 11.8493990826), (0, 9.3745253485))
            Line((0, 9.3745253485), (0, 12.8745253485))
            Line((0, 12.8745253485), (3.5, 12.8745253485))
        make_face()
    extrude(amount=F3_T49_DEPTH)

    split(bisect_by=Plane(origin=(12.087528689, 3.5226015958, 0), x_dir=(0, 0, 1), z_dir=(-0.9600624795, -0.2797856956, 0)), keep=Keep.TOP)


with BuildPart() as f3_tool43_1:
    add(f3_tool43.part)

    # F3_t51: intersect F3_tool47
    add(f3_tool47.part, mode=Mode.INTERSECT)


with BuildPart() as f1_21:
    add(f1_20.part)

    # F3_t41: cut F3_tool43
    add(f3_tool43_1.part, mode=Mode.SUBTRACT)


with BuildPart() as f3_tool54:
    # F3_s55 → F3_t56 (new body)
    with BuildSketch(Plane(origin=(0.3854463047, 0.0995218079, 0), x_dir=(0, 0, 1), z_dir=(0.9682458366, 0.25, 0))):
        with BuildLine():
            ThreePointArc((3.5, 11.25), (1.0251262658, 10.2248737342), (0, 7.75))
            Line((0, 7.75), (0, 11.25))
            Line((0, 11.25), (3.5, 11.25))
        make_face()
    extrude(amount=F3_T56_DEPTH)

    split(bisect_by=Plane(origin=(13.0842545446, -4.1955665749, 0), x_dir=(0, 0, 1), z_dir=(-0.9522421894, 0.3053437616, 0)), keep=Keep.TOP)


with BuildPart() as f3_tool58:
    # F3_s59 → F3_t60 (new body)
    with BuildSketch(Plane(origin=(-15.756012459, -49.1365525821, 0), x_dir=(0, 0, 1), z_dir=(0.3053437616, 0.9522421894, 0))):
        with BuildLine():
            ThreePointArc((3.5, 13.7404692741), (1.0251262658, 12.7153430082), (0, 10.2404692741))
            Line((0, 10.2404692741), (0, 13.7404692741))
            Line((0, 13.7404692741), (3.5, 13.7404692741))
        make_face()
    extrude(amount=F3_T60_DEPTH)

    split(bisect_by=Plane(origin=(2.8125, -10.8927656612, 0), x_dir=(0, 0, 1), z_dir=(-0.25, 0.9682458366, 0)), keep=Keep.TOP)


with BuildPart() as f3_tool54_1:
    add(f3_tool54.part)

    # F3_t62: intersect F3_tool58
    add(f3_tool58.part, mode=Mode.INTERSECT)


with BuildPart() as f1_22:
    add(f1_21.part)

    # F3_t52: cut F3_tool54
    add(f3_tool54_1.part, mode=Mode.SUBTRACT)


with BuildPart() as f3_tool65:
    # F3_s66 → F3_t67 (new body)
    with BuildSketch(Plane(origin=(-1.2576007444, 3.9219418787, 0), x_dir=(0, 0, 1), z_dir=(0.3053437616, -0.9522421894, 0))):
        with BuildLine():
            ThreePointArc((3.5, 13.7404692741), (1.0251262658, 12.7153430082), (0, 10.2404692741))
            Line((0, 10.2404692741), (0, 13.7404692741))
            Line((0, 13.7404692741), (3.5, 13.7404692741))
        make_face()
    extrude(amount=F3_T67_DEPTH)

    split(bisect_by=Plane(origin=(-2.8125, -10.8927656612, 0), x_dir=(0, 0, 1), z_dir=(0.25, 0.9682458366, 0)), keep=Keep.TOP)


with BuildPart() as f3_tool69:
    # F3_s70 → F3_t71 (new body)
    with BuildSketch(Plane(origin=(-50.6596510698, 13.0802656612, 0), x_dir=(0, 0, 1), z_dir=(0.9682458366, -0.25, 0))):
        with BuildLine():
            ThreePointArc((3.5, 11.25), (1.0251262658, 10.2248737342), (0, 7.75))
            Line((0, 7.75), (0, 11.25))
            Line((0, 11.25), (3.5, 11.25))
        make_face()
    extrude(amount=F3_T71_DEPTH)

    split(bisect_by=Plane(origin=(-13.0842545446, -4.1955665749, 0), x_dir=(0, 0, 1), z_dir=(0.9522421894, 0.3053437616, 0)), keep=Keep.TOP)


with BuildPart() as f3_tool65_1:
    add(f3_tool65.part)

    # F3_t73: intersect F3_tool69
    add(f3_tool69.part, mode=Mode.INTERSECT)


with BuildPart() as f1_23:
    add(f1_22.part)

    # F3_t63: cut F3_tool65
    add(f3_tool65_1.part, mode=Mode.SUBTRACT)


with BuildPart() as f3_tool76:
    # F3_s77 → F3_t78 (new body)
    with BuildSketch(Plane(origin=(3.5205438929, 1.1152400579, 0), x_dir=(0, 0, 1), z_dir=(-0.9533109565, -0.3019904306, 0))):
        with BuildLine():
            ThreePointArc((3.5, 13.5895693791), (1.0251262658, 12.5644431133), (0, 10.0895693791))
            Line((0, 10.0895693791), (0, 13.5895693791))
            Line((0, 13.5895693791), (3.5, 13.5895693791))
        make_face()
    extrude(amount=F3_T78_DEPTH)

    split(bisect_by=Plane(origin=(-11.1732270906, 2.9703047545, 0), x_dir=(0, 0, 1), z_dir=(0.9664332505, -0.2569178318, 0)), keep=Keep.TOP)


with BuildPart() as f3_tool80:
    # F3_s81 → F3_t82 (new body)
    with BuildSketch(Plane(origin=(13.4212581193, 50.4859861874, 0), x_dir=(0, 0, 1), z_dir=(-0.2569178318, -0.9664332505, 0))):
        with BuildLine():
            ThreePointArc((3.5, 11.5613024332), (1.0251262658, 10.5361761674), (0, 8.0613024332))
            Line((0, 8.0613024332), (0, 11.5613024332))
            Line((0, 11.5613024332), (3.5, 11.5613024332))
        make_face()
    extrude(amount=F3_T82_DEPTH)

    split(bisect_by=Plane(origin=(-4.1039199091, 12.9550853833, 0), x_dir=(0, 0, 1), z_dir=(0.3019904306, -0.9533109565, 0)), keep=Keep.TOP)


with BuildPart() as f3_tool76_1:
    add(f3_tool76.part)

    # F3_t84: intersect F3_tool80
    add(f3_tool80.part, mode=Mode.INTERSECT)


with BuildPart() as f1_24:
    add(f1_23.part)

    # F3_t74: cut F3_tool76
    add(f3_tool76_1.part, mode=Mode.SUBTRACT)


solid = f1_24.part
